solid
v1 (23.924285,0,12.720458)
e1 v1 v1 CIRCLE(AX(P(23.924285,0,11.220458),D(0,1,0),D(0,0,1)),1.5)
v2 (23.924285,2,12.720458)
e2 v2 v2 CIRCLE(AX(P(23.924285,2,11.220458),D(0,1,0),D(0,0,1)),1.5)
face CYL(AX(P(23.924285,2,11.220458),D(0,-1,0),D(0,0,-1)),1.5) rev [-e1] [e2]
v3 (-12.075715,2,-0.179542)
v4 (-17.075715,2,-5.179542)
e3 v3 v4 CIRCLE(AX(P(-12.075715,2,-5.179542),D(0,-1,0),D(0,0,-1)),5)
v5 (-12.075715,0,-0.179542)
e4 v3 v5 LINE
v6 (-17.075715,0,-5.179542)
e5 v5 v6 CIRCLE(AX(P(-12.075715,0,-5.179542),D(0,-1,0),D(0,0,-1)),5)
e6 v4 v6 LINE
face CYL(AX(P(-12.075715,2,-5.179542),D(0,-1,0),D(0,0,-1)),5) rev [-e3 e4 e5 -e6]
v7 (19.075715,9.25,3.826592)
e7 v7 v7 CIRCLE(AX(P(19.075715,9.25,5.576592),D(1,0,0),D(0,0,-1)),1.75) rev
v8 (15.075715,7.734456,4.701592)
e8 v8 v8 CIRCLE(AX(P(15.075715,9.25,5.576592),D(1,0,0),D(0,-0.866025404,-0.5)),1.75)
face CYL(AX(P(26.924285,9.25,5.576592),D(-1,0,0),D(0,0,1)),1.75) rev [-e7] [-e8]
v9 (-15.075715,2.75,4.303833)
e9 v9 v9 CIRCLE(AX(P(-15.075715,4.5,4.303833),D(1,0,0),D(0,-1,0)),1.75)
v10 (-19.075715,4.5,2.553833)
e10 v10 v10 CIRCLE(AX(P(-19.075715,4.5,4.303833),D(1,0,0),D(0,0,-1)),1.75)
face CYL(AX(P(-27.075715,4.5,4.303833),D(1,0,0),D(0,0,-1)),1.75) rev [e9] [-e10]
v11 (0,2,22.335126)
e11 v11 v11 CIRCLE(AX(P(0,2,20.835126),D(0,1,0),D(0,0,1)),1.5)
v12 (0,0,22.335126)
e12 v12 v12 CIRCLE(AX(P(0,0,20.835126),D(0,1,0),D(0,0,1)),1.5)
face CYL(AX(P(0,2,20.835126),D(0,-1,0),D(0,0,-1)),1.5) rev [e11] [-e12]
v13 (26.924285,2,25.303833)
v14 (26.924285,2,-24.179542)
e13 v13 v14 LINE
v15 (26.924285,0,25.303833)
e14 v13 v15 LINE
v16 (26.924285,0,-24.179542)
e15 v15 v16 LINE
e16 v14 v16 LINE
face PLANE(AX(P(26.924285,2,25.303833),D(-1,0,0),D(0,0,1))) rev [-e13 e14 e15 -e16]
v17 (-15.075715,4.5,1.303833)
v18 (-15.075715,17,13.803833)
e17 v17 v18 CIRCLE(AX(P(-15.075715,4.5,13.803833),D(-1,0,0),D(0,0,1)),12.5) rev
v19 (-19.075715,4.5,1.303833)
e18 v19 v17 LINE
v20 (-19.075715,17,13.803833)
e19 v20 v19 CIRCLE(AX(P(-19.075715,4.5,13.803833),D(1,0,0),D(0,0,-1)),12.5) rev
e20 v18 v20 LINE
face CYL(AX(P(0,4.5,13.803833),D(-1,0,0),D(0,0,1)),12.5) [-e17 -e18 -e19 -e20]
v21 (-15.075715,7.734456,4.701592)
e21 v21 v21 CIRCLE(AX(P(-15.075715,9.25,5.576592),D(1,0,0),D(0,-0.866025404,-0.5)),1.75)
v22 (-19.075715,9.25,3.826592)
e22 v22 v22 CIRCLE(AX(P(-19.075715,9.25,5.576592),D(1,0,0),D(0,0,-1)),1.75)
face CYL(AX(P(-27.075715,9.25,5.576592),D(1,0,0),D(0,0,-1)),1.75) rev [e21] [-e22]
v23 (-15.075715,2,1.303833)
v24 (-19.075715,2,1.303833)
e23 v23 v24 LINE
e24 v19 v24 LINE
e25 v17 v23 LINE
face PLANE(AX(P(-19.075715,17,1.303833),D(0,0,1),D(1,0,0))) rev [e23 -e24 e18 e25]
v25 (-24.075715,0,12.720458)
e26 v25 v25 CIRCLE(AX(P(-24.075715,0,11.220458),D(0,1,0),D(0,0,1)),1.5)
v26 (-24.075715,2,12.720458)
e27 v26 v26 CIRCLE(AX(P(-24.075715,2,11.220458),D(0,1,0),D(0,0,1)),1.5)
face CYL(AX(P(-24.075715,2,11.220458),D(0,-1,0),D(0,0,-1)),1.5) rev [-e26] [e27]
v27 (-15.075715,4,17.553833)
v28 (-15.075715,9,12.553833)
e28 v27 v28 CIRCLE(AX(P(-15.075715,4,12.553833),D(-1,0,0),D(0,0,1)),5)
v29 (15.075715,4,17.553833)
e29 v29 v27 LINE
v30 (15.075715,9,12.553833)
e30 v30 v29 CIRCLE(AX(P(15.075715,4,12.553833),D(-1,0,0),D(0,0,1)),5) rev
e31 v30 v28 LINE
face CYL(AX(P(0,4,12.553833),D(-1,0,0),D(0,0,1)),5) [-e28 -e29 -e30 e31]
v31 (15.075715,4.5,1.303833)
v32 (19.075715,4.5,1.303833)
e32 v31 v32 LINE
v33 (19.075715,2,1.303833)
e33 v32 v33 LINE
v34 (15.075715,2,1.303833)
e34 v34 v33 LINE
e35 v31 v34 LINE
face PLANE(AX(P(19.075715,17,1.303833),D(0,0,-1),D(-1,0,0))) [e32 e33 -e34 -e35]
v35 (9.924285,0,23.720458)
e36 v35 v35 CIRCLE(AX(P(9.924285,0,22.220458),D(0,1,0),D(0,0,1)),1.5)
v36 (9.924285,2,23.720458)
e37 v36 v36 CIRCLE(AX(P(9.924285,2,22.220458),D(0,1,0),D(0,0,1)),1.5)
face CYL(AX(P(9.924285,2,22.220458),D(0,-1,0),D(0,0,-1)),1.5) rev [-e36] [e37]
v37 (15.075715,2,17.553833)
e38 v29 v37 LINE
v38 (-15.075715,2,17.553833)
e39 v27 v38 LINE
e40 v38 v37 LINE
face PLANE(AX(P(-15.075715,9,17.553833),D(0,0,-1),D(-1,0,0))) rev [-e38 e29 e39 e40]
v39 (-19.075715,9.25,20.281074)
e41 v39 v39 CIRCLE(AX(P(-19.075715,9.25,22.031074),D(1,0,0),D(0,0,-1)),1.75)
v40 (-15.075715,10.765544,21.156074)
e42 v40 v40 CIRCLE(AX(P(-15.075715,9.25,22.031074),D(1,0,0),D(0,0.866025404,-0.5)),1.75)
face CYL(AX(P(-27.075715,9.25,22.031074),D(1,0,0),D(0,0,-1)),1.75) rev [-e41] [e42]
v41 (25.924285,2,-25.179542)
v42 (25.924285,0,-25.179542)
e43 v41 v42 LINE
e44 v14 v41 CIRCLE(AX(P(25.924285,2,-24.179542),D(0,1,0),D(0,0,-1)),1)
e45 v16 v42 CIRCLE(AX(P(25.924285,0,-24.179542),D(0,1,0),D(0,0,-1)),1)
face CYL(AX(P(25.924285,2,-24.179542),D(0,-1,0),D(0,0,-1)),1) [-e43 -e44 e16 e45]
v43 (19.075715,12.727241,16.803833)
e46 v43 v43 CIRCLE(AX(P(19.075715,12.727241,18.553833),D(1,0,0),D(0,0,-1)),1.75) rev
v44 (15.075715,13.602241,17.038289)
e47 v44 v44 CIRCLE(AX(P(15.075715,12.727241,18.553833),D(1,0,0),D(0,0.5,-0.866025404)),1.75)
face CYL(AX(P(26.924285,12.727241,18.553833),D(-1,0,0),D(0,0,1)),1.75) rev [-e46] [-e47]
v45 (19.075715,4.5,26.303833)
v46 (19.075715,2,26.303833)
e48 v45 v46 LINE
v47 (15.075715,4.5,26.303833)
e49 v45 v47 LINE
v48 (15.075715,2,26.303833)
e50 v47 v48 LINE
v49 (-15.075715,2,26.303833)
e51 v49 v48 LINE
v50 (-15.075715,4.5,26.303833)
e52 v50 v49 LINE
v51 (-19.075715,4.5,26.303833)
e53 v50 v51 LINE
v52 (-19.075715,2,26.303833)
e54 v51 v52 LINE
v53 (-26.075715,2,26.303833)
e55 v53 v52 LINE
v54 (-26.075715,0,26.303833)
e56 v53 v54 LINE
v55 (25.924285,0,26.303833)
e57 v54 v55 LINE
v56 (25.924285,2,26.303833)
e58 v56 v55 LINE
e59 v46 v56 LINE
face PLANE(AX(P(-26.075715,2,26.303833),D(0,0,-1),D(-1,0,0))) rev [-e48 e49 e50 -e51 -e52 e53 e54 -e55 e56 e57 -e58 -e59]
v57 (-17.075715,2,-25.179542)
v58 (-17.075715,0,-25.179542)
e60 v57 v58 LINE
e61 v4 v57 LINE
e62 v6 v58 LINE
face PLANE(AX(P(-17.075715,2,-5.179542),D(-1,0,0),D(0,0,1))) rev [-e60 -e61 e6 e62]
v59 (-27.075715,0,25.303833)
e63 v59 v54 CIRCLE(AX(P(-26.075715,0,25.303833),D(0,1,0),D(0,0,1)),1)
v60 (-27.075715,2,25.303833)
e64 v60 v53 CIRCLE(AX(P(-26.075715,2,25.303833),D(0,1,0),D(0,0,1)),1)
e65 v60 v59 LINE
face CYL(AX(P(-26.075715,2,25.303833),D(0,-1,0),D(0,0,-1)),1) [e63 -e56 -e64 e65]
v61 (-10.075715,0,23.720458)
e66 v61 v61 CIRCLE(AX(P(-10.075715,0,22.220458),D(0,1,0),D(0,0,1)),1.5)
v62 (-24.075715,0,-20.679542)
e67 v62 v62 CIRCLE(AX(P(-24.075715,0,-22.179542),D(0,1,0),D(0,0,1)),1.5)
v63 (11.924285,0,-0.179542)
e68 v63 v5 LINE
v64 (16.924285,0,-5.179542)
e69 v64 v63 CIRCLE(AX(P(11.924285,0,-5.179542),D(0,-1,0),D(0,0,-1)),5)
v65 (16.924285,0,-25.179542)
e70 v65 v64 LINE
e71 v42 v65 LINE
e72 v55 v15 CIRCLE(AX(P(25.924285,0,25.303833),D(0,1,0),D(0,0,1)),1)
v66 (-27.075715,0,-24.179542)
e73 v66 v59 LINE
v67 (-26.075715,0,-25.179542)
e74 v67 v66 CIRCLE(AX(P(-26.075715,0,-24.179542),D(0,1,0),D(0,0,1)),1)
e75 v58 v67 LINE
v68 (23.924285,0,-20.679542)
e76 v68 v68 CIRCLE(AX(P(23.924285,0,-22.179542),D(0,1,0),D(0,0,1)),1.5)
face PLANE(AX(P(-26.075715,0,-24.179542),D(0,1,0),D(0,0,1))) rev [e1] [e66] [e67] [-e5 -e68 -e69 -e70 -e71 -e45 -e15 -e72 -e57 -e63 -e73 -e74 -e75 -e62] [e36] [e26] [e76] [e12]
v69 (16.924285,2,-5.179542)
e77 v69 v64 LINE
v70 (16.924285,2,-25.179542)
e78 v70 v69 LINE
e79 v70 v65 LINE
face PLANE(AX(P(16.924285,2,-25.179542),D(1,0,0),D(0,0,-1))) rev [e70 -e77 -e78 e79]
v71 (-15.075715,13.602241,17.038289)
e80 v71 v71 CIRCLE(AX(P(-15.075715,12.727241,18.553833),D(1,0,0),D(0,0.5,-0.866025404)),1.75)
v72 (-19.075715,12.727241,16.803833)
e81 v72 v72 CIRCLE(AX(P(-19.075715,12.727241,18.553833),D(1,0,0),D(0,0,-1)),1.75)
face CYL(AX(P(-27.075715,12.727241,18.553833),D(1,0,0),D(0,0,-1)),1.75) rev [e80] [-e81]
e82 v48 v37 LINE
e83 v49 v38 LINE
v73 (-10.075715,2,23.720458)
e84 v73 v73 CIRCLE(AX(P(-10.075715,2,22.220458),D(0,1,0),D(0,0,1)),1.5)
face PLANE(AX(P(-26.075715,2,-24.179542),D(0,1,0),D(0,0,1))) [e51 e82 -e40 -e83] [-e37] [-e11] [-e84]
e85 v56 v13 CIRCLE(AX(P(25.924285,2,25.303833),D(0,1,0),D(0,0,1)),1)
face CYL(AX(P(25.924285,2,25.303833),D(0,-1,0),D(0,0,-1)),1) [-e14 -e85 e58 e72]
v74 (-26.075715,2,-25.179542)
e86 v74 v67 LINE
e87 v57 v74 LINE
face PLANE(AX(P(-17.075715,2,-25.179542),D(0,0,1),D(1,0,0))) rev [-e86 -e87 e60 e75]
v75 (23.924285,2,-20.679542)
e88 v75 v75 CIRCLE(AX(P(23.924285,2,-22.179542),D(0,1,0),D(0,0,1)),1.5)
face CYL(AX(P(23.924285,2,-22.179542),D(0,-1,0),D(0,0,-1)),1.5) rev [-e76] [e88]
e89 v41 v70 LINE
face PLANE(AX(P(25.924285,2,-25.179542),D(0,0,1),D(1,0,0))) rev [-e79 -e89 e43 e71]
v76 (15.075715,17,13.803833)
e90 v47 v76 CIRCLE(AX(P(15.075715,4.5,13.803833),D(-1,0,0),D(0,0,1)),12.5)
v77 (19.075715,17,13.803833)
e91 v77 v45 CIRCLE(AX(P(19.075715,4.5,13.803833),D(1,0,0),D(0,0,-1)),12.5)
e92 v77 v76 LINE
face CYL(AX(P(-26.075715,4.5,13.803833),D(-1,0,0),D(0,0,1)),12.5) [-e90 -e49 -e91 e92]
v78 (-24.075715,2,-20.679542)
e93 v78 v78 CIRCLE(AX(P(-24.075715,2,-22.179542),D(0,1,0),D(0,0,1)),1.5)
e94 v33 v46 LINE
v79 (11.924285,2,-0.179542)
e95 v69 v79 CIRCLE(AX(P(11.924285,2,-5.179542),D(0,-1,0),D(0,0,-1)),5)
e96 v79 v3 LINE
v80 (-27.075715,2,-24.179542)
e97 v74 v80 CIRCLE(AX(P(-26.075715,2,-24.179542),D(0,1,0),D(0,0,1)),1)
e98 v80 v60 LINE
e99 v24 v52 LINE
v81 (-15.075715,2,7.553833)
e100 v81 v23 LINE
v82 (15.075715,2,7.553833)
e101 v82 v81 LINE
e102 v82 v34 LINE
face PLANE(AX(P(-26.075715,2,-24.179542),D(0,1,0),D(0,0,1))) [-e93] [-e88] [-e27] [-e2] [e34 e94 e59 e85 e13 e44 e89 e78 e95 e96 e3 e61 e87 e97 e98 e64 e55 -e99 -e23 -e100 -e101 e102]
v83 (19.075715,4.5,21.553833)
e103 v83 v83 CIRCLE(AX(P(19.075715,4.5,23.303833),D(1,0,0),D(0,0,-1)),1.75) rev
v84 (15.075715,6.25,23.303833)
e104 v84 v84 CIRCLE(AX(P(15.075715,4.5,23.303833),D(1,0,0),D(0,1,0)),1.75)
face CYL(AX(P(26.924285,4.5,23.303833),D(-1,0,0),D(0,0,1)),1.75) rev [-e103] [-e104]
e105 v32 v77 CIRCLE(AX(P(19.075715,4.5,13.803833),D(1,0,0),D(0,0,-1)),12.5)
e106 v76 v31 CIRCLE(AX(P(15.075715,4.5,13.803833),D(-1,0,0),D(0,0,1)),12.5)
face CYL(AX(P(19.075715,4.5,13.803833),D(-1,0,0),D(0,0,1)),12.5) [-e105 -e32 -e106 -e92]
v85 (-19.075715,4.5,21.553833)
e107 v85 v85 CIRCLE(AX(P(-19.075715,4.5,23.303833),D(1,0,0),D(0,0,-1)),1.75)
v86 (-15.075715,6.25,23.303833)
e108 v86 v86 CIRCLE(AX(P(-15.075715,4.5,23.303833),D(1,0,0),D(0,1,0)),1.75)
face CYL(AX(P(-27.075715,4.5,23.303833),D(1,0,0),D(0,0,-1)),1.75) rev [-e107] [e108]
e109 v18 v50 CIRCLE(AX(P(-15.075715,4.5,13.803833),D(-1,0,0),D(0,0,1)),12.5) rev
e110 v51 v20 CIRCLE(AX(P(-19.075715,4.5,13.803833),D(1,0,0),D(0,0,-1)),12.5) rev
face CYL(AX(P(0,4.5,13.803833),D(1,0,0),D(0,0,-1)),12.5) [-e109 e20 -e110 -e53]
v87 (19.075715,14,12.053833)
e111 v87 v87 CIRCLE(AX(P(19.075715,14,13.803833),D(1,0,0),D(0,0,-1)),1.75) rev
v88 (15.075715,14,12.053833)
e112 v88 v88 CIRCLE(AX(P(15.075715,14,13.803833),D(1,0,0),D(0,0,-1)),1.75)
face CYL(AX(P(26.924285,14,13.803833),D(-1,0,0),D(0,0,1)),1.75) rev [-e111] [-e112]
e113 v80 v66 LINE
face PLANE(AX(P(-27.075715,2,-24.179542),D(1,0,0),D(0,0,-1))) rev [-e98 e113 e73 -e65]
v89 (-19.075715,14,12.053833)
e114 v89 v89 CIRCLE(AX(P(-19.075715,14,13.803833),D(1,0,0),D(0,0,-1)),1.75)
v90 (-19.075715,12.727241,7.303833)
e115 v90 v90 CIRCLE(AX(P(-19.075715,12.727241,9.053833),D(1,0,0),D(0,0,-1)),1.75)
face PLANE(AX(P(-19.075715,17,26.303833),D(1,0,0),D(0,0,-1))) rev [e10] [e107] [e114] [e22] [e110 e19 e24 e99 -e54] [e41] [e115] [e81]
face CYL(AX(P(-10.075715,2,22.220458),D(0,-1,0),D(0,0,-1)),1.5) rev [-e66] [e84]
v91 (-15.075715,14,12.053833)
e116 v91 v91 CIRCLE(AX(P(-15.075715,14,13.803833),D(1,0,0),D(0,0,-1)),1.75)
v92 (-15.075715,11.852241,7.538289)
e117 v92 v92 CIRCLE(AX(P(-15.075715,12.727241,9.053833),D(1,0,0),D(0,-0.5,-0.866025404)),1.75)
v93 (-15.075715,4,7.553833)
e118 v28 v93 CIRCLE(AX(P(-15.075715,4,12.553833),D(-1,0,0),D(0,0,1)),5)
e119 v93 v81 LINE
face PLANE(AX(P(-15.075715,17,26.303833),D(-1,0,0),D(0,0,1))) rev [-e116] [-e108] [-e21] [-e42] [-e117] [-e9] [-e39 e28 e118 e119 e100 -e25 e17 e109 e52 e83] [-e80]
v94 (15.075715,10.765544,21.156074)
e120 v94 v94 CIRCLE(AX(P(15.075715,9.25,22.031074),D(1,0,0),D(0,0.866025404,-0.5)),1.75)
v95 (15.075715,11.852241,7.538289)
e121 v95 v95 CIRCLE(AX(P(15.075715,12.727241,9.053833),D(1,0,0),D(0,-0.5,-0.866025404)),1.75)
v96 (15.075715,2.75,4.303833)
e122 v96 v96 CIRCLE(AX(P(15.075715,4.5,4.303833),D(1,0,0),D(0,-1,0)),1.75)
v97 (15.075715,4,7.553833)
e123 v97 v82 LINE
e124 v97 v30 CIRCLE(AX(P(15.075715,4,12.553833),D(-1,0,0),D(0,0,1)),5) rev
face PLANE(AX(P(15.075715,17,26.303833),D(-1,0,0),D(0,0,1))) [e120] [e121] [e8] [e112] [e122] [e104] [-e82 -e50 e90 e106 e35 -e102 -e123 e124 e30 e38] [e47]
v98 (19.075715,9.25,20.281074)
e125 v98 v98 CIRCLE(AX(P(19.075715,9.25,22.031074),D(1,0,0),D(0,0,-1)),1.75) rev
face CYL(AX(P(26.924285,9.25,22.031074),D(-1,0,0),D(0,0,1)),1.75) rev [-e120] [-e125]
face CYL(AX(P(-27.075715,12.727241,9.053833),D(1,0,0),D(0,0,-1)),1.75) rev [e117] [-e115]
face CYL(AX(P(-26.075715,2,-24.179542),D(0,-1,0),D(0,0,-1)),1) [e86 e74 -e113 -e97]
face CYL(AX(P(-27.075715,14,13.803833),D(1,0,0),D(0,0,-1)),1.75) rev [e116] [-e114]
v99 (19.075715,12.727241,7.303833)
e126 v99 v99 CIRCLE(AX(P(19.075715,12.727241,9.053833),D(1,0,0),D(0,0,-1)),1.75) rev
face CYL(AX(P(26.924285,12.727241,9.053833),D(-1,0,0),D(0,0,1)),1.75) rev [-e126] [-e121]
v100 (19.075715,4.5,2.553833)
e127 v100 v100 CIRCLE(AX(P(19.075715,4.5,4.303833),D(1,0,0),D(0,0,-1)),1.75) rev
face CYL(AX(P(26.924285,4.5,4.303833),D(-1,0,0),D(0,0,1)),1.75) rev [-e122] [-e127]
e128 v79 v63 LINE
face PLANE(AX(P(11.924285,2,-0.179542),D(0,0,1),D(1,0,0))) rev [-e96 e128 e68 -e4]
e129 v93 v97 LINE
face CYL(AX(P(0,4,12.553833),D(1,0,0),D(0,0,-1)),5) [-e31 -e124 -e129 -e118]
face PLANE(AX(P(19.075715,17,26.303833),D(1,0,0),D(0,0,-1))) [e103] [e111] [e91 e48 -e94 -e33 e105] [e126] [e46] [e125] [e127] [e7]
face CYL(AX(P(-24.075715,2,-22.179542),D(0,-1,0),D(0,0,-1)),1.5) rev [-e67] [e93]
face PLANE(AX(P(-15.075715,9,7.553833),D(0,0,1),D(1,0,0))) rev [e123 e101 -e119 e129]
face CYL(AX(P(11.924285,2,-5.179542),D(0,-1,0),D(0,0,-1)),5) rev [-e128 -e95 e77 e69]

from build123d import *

# Parameters (mm, degrees)
SKETCH1_R                       = 1.5
BOSS_EXTRUDE1_DEPTH             = 2
SKETCH2_W                       = 4
SKETCH2_H                       = 25
BOSS_EXTRUDE2_DEPTH             = 15
FILLET1_R                       = 12.5
SKETCH3_R                       = 1.75
CUT_EXTRUDE3_DEPTH              = 53.391713426
CIRPATTERN1_COUNT               = 4
CIRPATTERN1_ANGLE               = 90
CIRPATTERN1_THE_OTHER_WAY_COUNT = 4
CIRPATTERN1_THE_OTHER_WAY_ANGLE = 90
MIRROR1_COPY_1_SKETCH_R         = 1.75
MIRROR1_COPY_1_DEPTH            = 53.391713426
MIRROR1_COPY_2_SKETCH_R         = 1.75
MIRROR1_COPY_2_DEPTH            = 53.391713426
MIRROR1_COPY_3_SKETCH_R         = 1.75
MIRROR1_COPY_3_DEPTH            = 53.391713426
MIRROR1_COPY_4_SKETCH_R         = 1.75
MIRROR1_COPY_4_DEPTH            = 53.391713426
MIRROR1_COPY_5_SKETCH_R         = 1.75
MIRROR1_COPY_5_DEPTH            = 53.391713426
MIRROR1_COPY_6_SKETCH_R         = 1.75
MIRROR1_COPY_6_DEPTH            = 53.391713426
FILLET1_OF_MIRROR1_R            = 12.5
SKETCH4_W                       = 30.151429758
SKETCH4_H                       = 10
BOSS_EXTRUDE3_DEPTH             = 7
FILLET2_R                       = 5


with BuildPart() as part:
    # Sketch1 → Boss-Extrude1 (new body)
    with BuildSketch(Plane(origin=(0, 0, 0), x_dir=(1, 0, 0), z_dir=(0, 1, 0))):
        with BuildLine():
            Line((-17.075714879, 5.179541619), (-17.075714879, 25.179541619))
            Line((-17.075714879, 25.179541619), (-26.075714879, 25.179541619))
            ThreePointArc((-26.075714879, 25.179541619), (-26.782821661, 24.8866484), (-27.075714879, 24.179541619))
            Line((-27.075714879, 24.179541619), (-27.075714879, -25.303833099))
            ThreePointArc((-27.075714879, -25.303833099), (-26.782821661, -26.010939881), (-26.075714879, -26.303833099))
            Line((-26.075714879, -26.303833099), (25.924285121, -26.303833099))
            ThreePointArc((25.924285121, -26.303833099), (26.631391902, -26.010939881), (26.924285121, -25.303833099))
            Line((26.924285121, -25.303833099), (26.924285121, 24.179541619))
            ThreePointArc((26.924285121, 24.179541619), (26.631391902, 24.8866484), (25.924285121, 25.179541619))
            Line((25.924285121, 25.179541619), (16.924285121, 25.179541619))
            Line((16.924285121, 25.179541619), (16.924285121, 5.179541619))
            ThreePointArc((16.924285121, 5.179541619), (15.459819027, 1.644007713), (11.924285121, 0.179541619))
            Line((11.924285121, 0.179541619), (-12.075714879, 0.179541619))
            ThreePointArc((-12.075714879, 0.179541619), (-15.611248785, 1.644007713), (-17.075714879, 5.179541619))
        make_face()
        with Locations(Location((-24.075714879, 22.179541619, 0), (0, 0, 270))):
            Circle(SKETCH1_R, mode=Mode.SUBTRACT)
        with Locations(Location((23.924285121, 22.179541619, 0), (0, 0, 270))):
            Circle(SKETCH1_R, mode=Mode.SUBTRACT)
        with Locations(Location((-24.075714879, -11.220458381, 0), (0, 0, 270))):
            Circle(SKETCH1_R, mode=Mode.SUBTRACT)
        with Locations(Location((-10.075714879, -22.220458381, 0), (0, 0, 270))):
            Circle(SKETCH1_R, mode=Mode.SUBTRACT)
        with Locations(Location((9.924285121, -22.220458381, 0), (0, 0, 270))):
            Circle(SKETCH1_R, mode=Mode.SUBTRACT)
        with Locations(Location((0, -20.835125629, 0), (0, 0, 270))):
            Circle(SKETCH1_R, mode=Mode.SUBTRACT)
        with Locations(Location((23.924285121, -11.220458381, 0), (0, 0, 270))):
            Circle(SKETCH1_R, mode=Mode.SUBTRACT)
    extrude(amount=BOSS_EXTRUDE1_DEPTH)

    # Sketch2 → Boss-Extrude2 (add)
    with BuildSketch(Plane(origin=(0, 2, 0), x_dir=(1, 0, 0), z_dir=(0, 1, 0))):
        with Locations((-17.075714879, -13.803833099)):
            Rectangle(SKETCH2_W, SKETCH2_H)
    boss_extrude2 = extrude(amount=BOSS_EXTRUDE2_DEPTH)

    # Fillet1
    fillet1_edges = [part.edges().sort_by_distance(p)[0] for p in [
        (-17.075714879, 17, 26.303833099),
        (-17.075714879, 17, 1.303833099),
    ]]
    fillet(fillet1_edges, radius=FILLET1_R - 0.0001)  # a hair under: the kernel refuses the full size

    # Sketch3 → Cut-Extrude3 (cut, through all)
    with BuildSketch(Plane(origin=(-15.075714879, 0, 0), x_dir=(0, 0, -1), z_dir=(1, 0, 0))):
        with Locations((-13.803833099, 14)):
            Circle(SKETCH3_R)
    cut_extrude3 = extrude(amount=-CUT_EXTRUDE3_DEPTH, mode=Mode.SUBTRACT)

    # CirPattern1: Cut-Extrude3 ×4 about axis
    cirpattern1_axis = Axis((0, 4.5, 13.803833099), (1, 0, 0))
    for i in range(1, CIRPATTERN1_COUNT):
        add(cut_extrude3.rotate(cirpattern1_axis, i * CIRPATTERN1_ANGLE / (CIRPATTERN1_COUNT - 1)), mode=Mode.SUBTRACT)

    # CirPattern1 the other way: Cut-Extrude3 ×4 about axis
    cirpattern1_the_other_way_axis = Axis((0, 4.5, 13.803833099), (-1, 0, 0))
    for i in range(1, CIRPATTERN1_THE_OTHER_WAY_COUNT):
        add(cut_extrude3.rotate(cirpattern1_the_other_way_axis, i * CIRPATTERN1_THE_OTHER_WAY_ANGLE / (CIRPATTERN1_THE_OTHER_WAY_COUNT - 1)), mode=Mode.SUBTRACT)

    # Mirror1: Boss-Extrude2, Cut-Extrude3 across plane
    add(boss_extrude2.mirror(Plane(origin=(0, 0, 0), x_dir=(0, 0, 1), z_dir=(1, 0, 0))))
    add(cut_extrude3.mirror(Plane(origin=(0, 0, 0), x_dir=(0, 0, 1), z_dir=(1, 0, 0))), mode=Mode.SUBTRACT)

    # Mirror1 copy 1 sketch → Mirror1 copy 1 (cut, through all)
    with BuildSketch(Plane(origin=(15.075714879, 7.504802233, -0.400637034), x_dir=(0, 0.5000000000000008, -0.8660254037844382), z_dir=(-1, 0, 0))):
        with Locations((-13.803833099, -14)):
            Circle(MIRROR1_COPY_1_SKETCH_R)
    extrude(amount=-MIRROR1_COPY_1_DEPTH, mode=Mode.SUBTRACT)

    # Mirror1 copy 2 sketch → Mirror1 copy 2 (cut, through all)
    with BuildSketch(Plane(origin=(15.075714879, 14.204470134, 3.004802233), x_dir=(0, 0.8660254037844396, -0.4999999999999984), z_dir=(-1, 0, 0))):
        with Locations((-13.803833099, -14)):
            Circle(MIRROR1_COPY_2_SKETCH_R)
    extrude(amount=-MIRROR1_COPY_2_DEPTH, mode=Mode.SUBTRACT)

    # Mirror1 copy 3 sketch → Mirror1 copy 3 (cut, through all)
    with BuildSketch(Plane(origin=(15.075714879, 18.303833099, 9.303833099), x_dir=(0, 1, 0), z_dir=(-1, 0, 0))):
        with Locations((-13.803833099, -14)):
            Circle(MIRROR1_COPY_3_SKETCH_R)
    extrude(amount=-MIRROR1_COPY_3_DEPTH, mode=Mode.SUBTRACT)

    # Mirror1 copy 4 sketch → Mirror1 copy 4 (cut, through all)
    with BuildSketch(Plane(origin=(15.075714879, -6.299030867, 4.099362966), x_dir=(0, -0.5000000000000008, -0.8660254037844382), z_dir=(-1, 0, 0))):
        with Locations((-13.803833099, -14)):
            Circle(MIRROR1_COPY_4_SKETCH_R)
    extrude(amount=-MIRROR1_COPY_4_DEPTH, mode=Mode.SUBTRACT)

    # Mirror1 copy 5 sketch → Mirror1 copy 5 (cut, through all)
    with BuildSketch(Plane(origin=(15.075714879, -9.704470134, 10.799030867), x_dir=(0, -0.8660254037844396, -0.4999999999999984), z_dir=(-1, 0, 0))):
        with Locations((-13.803833099, -14)):
            Circle(MIRROR1_COPY_5_SKETCH_R)
    extrude(amount=-MIRROR1_COPY_5_DEPTH, mode=Mode.SUBTRACT)

    # Mirror1 copy 6 sketch → Mirror1 copy 6 (cut, through all)
    with BuildSketch(Plane(origin=(15.075714879, -9.303833099, 18.303833099), x_dir=(0, -1, 0), z_dir=(-1, 0, 0))):
        with Locations((-13.803833099, -14)):
            Circle(MIRROR1_COPY_6_SKETCH_R)
    extrude(amount=-MIRROR1_COPY_6_DEPTH, mode=Mode.SUBTRACT)

    # Fillet1 of Mirror1
    fillet1_of_mirror1_edges = [part.edges().sort_by_distance(p)[0] for p in [
        (17.075714879, 17, 26.303833099),
        (17.075714879, 17, 1.303833099),
    ]]
    fillet(fillet1_of_mirror1_edges, radius=FILLET1_OF_MIRROR1_R - 0.0001)  # a hair under: the kernel refuses the full size

    # Sketch4 → Boss-Extrude3 (add)
    with BuildSketch(Plane(origin=(0, 2, 0), x_dir=(1, 0, 0), z_dir=(0, 1, 0))):
        with Locations((0, -12.553833099)):
            Rectangle(SKETCH4_W, SKETCH4_H)
    extrude(amount=BOSS_EXTRUDE3_DEPTH)

    # Fillet2
    fillet2_edges = [part.edges().sort_by_distance(p)[0] for p in [
        (0, 9, 17.553833099),
        (0, 9, 7.553833099),
    ]]
    fillet(fillet2_edges, radius=FILLET2_R - 0.0001)  # a hair under: the kernel refuses the full size


solid = part.part
